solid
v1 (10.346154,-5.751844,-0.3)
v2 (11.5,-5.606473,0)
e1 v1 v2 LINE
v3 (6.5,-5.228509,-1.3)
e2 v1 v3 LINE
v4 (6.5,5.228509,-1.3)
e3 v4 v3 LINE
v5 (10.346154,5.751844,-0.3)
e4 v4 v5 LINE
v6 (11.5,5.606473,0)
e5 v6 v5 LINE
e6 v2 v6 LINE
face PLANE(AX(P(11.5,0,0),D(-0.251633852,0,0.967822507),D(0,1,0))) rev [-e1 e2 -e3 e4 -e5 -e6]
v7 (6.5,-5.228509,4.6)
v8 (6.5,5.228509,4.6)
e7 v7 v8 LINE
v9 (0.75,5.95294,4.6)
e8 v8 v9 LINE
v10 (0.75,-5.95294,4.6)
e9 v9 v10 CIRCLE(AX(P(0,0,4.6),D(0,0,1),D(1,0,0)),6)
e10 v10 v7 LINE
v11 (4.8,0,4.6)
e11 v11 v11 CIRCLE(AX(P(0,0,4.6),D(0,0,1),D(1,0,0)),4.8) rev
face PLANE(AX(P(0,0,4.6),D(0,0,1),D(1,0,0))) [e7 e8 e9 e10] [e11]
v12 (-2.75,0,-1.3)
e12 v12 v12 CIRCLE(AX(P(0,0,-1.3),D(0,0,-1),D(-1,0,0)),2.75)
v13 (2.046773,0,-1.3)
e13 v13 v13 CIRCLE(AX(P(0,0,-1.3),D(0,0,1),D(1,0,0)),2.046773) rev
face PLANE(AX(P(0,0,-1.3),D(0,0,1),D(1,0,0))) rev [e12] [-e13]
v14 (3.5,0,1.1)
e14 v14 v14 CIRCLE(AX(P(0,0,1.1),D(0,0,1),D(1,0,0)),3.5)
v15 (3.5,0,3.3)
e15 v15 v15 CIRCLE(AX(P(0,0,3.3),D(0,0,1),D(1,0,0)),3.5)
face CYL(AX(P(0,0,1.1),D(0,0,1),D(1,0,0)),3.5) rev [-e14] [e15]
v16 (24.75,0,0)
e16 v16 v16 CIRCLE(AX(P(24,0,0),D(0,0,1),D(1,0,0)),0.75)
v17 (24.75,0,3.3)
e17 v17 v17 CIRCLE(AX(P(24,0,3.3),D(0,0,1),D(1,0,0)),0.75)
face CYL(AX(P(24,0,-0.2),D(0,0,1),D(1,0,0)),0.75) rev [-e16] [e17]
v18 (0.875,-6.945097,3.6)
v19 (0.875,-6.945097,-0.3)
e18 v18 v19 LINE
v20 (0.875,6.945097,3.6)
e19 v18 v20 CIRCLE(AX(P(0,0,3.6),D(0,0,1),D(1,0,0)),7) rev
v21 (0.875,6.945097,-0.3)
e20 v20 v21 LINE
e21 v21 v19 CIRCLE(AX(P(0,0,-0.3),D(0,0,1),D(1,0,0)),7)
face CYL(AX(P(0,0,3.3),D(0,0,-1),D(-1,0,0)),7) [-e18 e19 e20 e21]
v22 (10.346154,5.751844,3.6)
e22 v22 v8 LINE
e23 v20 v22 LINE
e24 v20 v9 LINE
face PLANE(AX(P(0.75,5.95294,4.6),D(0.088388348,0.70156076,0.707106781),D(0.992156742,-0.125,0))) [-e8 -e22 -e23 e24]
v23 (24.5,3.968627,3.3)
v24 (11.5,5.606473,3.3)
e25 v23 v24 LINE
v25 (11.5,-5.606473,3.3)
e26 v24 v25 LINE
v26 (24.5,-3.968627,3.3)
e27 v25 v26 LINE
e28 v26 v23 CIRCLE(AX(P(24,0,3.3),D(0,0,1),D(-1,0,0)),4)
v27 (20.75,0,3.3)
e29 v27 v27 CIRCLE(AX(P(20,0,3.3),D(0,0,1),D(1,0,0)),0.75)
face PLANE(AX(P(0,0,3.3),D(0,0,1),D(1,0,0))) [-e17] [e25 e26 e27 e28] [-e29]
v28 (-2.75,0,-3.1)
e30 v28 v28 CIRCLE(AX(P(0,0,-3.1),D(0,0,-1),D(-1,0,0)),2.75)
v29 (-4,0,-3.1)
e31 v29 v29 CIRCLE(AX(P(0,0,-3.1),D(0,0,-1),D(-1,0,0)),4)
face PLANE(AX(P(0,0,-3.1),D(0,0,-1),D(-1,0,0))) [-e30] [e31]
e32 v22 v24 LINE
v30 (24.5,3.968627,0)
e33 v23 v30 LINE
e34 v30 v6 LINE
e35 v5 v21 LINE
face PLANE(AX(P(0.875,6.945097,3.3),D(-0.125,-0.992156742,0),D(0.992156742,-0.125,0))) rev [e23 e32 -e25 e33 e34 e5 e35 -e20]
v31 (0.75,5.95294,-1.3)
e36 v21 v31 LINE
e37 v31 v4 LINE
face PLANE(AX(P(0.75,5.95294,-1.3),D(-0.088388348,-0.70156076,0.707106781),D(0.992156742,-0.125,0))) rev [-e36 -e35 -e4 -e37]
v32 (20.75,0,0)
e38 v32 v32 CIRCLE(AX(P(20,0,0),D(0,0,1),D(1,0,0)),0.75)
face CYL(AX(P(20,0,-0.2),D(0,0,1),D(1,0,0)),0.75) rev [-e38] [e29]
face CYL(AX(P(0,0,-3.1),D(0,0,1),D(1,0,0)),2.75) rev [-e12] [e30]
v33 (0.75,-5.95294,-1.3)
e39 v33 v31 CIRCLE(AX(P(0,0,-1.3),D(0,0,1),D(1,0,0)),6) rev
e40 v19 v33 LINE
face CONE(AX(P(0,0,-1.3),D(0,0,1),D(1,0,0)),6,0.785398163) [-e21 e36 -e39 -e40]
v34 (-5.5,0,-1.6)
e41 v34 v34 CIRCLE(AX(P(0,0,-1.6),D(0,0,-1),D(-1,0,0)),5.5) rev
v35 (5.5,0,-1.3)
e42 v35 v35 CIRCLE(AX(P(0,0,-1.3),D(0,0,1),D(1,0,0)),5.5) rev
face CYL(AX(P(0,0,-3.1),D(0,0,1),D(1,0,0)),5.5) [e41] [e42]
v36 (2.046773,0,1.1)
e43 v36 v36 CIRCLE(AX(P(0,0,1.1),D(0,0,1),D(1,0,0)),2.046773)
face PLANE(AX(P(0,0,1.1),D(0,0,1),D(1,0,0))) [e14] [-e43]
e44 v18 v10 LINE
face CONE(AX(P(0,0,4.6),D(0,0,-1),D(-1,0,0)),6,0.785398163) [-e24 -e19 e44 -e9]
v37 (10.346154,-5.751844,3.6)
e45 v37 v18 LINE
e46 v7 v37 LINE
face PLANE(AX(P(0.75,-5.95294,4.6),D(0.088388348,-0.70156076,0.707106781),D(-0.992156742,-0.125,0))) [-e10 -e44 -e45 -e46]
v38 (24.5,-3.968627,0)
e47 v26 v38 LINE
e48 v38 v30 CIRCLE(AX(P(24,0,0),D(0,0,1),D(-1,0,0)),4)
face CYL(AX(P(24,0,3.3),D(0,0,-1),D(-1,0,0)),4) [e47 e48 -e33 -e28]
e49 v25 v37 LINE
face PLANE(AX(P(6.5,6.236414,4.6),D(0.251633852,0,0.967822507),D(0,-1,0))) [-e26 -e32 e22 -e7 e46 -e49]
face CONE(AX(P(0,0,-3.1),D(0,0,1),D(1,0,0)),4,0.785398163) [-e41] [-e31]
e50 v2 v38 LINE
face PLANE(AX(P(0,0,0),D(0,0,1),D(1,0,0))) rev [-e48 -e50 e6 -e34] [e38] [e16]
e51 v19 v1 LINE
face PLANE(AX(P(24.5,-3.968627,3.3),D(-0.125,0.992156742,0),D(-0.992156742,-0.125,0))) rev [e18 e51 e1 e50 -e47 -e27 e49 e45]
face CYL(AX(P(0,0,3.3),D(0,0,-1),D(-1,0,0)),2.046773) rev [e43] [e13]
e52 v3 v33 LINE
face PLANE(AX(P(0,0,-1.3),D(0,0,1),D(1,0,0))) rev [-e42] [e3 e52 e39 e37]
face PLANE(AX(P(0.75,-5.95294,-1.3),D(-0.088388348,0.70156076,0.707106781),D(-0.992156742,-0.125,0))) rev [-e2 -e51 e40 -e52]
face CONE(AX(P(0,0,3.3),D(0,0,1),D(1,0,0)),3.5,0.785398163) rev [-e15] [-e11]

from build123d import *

# Parameters (mm, degrees)
ESQUISSE1_R             = 2.046773471
BOSS_EXTRU_1_DEPTH      = 3.3
BOSS_EXTRU_2_DEPTH      = 1.3
BOSS_EXTRU_2_DEPTH_BACK = 4.6
ESQUISSE2_R             = 2.046773471
CHANFREIN1_SIZE         = 5
CHANFREIN1_SIZE_2       = 1.3
CHANFREIN3_SIZE         = 5
CHANFREIN3_SIZE_2       = 1.3
CHANFREIN2_SIZE         = 1
ESQUISSE3_R             = 5.5
ESQUISSE3_R_2           = 2.75
BOSS_EXTRU_3_DEPTH      = 1.8
CHANFREIN4_SIZE         = 1.5
ESQUISSE4_R             = 3.5
ENL_V_MAT_EXTRU_1_DEPTH = 3.5
CHANFREIN5_SIZE         = 1.3
ESQUISSE5_R             = 0.75
ENL_V_MAT_EXTRU_2_DEPTH = 3.5


with BuildPart() as part:
    # Esquisse1 → Boss.-Extru.1 (new body)
    with BuildSketch(Plane.XY):
        with BuildLine():
            Line((0.875, 6.945097192), (24.5, 3.968626967))
            ThreePointArc((24.5, 3.968626967), (28, 0), (24.5, -3.968626967))
            Line((24.5, -3.968626967), (0.875, -6.945097192))
            ThreePointArc((0.875, -6.945097192), (-7, 0), (0.875, 6.945097192))
        make_face()
        Circle(ESQUISSE1_R, mode=Mode.SUBTRACT)
    extrude(amount=BOSS_EXTRU_1_DEPTH)

    # Esquisse2 → Boss.-Extru.2 (add, two sides: drawn at the far end of the back side and taken through both)
    with BuildSketch(Plane.XY.offset(3.3).offset(-BOSS_EXTRU_2_DEPTH_BACK)):
        with BuildLine():
            Line((0.875, 6.945097192), (6.5, 6.236413805))
            Line((6.5, 6.236413805), (6.5, -6.236413805))
            Line((6.5, -6.236413805), (0.875, -6.945097192))
            ThreePointArc((0.875, -6.945097192), (-7, 0), (0.875, 6.945097192))
        make_face()
        Circle(ESQUISSE2_R, mode=Mode.SUBTRACT)
    extrude(amount=BOSS_EXTRU_2_DEPTH + BOSS_EXTRU_2_DEPTH_BACK)

    # Chanfrein1
    # the kernel refuses this chamfer: 5, 1.3 mm, written as the material it adds along each edge
    with BuildSketch(Plane(origin=(6.5, 19.22093464, 3.3), x_dir=(0.9999530531472482, 0, -0.009689762716214913), z_dir=(0, -1, 0))) as chanfrein1_piece_1_section:
        Polygon((CHANFREIN1_SIZE * 0.999953053147, CHANFREIN1_SIZE * 0.00968976271621), (-CHANFREIN1_SIZE_2 * 0.00968976271621, CHANFREIN1_SIZE_2 * 0.999953053147), (0, 0), align=None)
    chanfrein1_piece_1 = extrude(amount=38.441869281, mode=Mode.PRIVATE)
    chanfrein1_piece_1 = split(chanfrein1_piece_1, bisect_by=Plane(origin=(8.958471047, 5.926675567, 3.684204829), z_dir=(-0.12500000000000006, -0.9921567416492215, 0)), keep=Keep.TOP, mode=Mode.PRIVATE)
    chanfrein1_piece_1 = split(chanfrein1_piece_1, bisect_by=Plane(origin=(8.958471047, -5.926675567, 3.684204829), z_dir=(-0.1249999999999999, 0.9921567416492215, 0)), keep=Keep.TOP, mode=Mode.PRIVATE)
    chanfrein1_piece_1 = split(chanfrein1_piece_1, bisect_by=Plane(origin=(8.211780112, 0, 4.6), z_dir=(0, 0, -1)), keep=Keep.TOP, mode=Mode.PRIVATE)
    add(chanfrein1_piece_1)

    # Chanfrein3
    # the kernel refuses this chamfer: 5, 1.3 mm, written as the material it adds along each edge
    with BuildSketch(Plane(origin=(6.5, 19.22093464, 0), x_dir=(0.9999530531472482, 0, 0.009689762716214958), z_dir=(0, -1, 0))) as chanfrein3_piece_1_section:
        Polygon((CHANFREIN3_SIZE * 0.999953053147, -CHANFREIN3_SIZE * 0.00968976271621), (-CHANFREIN3_SIZE_2 * 0.00968976271621, -CHANFREIN3_SIZE_2 * 0.999953053147), (0, 0), align=None)
    chanfrein3_piece_1 = extrude(amount=38.441869281, mode=Mode.PRIVATE)
    chanfrein3_piece_1 = split(chanfrein3_piece_1, bisect_by=Plane(origin=(8.958471047, 5.926675567, -0.384204829), z_dir=(-0.1250000000000275, -0.9921567416492181, 0)), keep=Keep.TOP, mode=Mode.PRIVATE)
    chanfrein3_piece_1 = split(chanfrein3_piece_1, bisect_by=Plane(origin=(8.958471047, -5.926675567, -0.384204829), z_dir=(-0.1250000000000275, 0.9921567416492181, 0)), keep=Keep.TOP, mode=Mode.PRIVATE)
    chanfrein3_piece_1 = split(chanfrein3_piece_1, bisect_by=Plane(origin=(8.211780112, 0, -1.3), z_dir=(0, 0, 1)), keep=Keep.TOP, mode=Mode.PRIVATE)
    add(chanfrein3_piece_1)

    # Chanfrein2
    chanfrein2_edges = [part.edges().sort_by_distance(p)[0] for p in [
        (-7, 0, -1.3),
        (3.6875, 6.590755498, -1.3),
        (3.6875, -6.590755498, -1.3),
        (-7, 0, 4.6),
        (3.6875, -6.590755498, 4.6),
        (3.6875, 6.590755498, 4.6),
    ]]
    chamfer(chanfrein2_edges, length=CHANFREIN2_SIZE)

    # Esquisse3 → Boss.-Extru.3 (add)
    with BuildSketch(Plane(origin=(0, 0, -1.3), x_dir=(-1, 0, 0), z_dir=(0, 0, -1))):
        with Locations(Location((0, 0, 0), (0, 0, 180))):
            Circle(ESQUISSE3_R)
        Circle(ESQUISSE3_R_2, mode=Mode.SUBTRACT)
    extrude(amount=BOSS_EXTRU_3_DEPTH)

    # Chanfrein4
    chanfrein4_edges = [part.edges().sort_by_distance(p)[0] for p in [
        (-5.5, 0, -3.1),
    ]]
    chamfer(chanfrein4_edges, length=CHANFREIN4_SIZE)

    # Esquisse4 → Enlèv. mat.-Extru.1 (cut)
    with BuildSketch(Plane.XY.offset(4.6)):
        Circle(ESQUISSE4_R)
    extrude(amount=-ENL_V_MAT_EXTRU_1_DEPTH, mode=Mode.SUBTRACT)

    # Chanfrein5
    chanfrein5_edges = [part.edges().sort_by_distance(p)[0] for p in [
        (-3.5, 0, 4.6),
    ]]
    chamfer(chanfrein5_edges, length=CHANFREIN5_SIZE)

    # Esquisse5 → Enlèv. mat.-Extru.2 (cut)
    with BuildSketch(Plane.XY.offset(3.3)):
        with Locations((24, 0)):
            Circle(ESQUISSE5_R)
        with Locations((20, 0)):
            Circle(ESQUISSE5_R)
    extrude(amount=-ENL_V_MAT_EXTRU_2_DEPTH, mode=Mode.SUBTRACT)


solid = part.part
